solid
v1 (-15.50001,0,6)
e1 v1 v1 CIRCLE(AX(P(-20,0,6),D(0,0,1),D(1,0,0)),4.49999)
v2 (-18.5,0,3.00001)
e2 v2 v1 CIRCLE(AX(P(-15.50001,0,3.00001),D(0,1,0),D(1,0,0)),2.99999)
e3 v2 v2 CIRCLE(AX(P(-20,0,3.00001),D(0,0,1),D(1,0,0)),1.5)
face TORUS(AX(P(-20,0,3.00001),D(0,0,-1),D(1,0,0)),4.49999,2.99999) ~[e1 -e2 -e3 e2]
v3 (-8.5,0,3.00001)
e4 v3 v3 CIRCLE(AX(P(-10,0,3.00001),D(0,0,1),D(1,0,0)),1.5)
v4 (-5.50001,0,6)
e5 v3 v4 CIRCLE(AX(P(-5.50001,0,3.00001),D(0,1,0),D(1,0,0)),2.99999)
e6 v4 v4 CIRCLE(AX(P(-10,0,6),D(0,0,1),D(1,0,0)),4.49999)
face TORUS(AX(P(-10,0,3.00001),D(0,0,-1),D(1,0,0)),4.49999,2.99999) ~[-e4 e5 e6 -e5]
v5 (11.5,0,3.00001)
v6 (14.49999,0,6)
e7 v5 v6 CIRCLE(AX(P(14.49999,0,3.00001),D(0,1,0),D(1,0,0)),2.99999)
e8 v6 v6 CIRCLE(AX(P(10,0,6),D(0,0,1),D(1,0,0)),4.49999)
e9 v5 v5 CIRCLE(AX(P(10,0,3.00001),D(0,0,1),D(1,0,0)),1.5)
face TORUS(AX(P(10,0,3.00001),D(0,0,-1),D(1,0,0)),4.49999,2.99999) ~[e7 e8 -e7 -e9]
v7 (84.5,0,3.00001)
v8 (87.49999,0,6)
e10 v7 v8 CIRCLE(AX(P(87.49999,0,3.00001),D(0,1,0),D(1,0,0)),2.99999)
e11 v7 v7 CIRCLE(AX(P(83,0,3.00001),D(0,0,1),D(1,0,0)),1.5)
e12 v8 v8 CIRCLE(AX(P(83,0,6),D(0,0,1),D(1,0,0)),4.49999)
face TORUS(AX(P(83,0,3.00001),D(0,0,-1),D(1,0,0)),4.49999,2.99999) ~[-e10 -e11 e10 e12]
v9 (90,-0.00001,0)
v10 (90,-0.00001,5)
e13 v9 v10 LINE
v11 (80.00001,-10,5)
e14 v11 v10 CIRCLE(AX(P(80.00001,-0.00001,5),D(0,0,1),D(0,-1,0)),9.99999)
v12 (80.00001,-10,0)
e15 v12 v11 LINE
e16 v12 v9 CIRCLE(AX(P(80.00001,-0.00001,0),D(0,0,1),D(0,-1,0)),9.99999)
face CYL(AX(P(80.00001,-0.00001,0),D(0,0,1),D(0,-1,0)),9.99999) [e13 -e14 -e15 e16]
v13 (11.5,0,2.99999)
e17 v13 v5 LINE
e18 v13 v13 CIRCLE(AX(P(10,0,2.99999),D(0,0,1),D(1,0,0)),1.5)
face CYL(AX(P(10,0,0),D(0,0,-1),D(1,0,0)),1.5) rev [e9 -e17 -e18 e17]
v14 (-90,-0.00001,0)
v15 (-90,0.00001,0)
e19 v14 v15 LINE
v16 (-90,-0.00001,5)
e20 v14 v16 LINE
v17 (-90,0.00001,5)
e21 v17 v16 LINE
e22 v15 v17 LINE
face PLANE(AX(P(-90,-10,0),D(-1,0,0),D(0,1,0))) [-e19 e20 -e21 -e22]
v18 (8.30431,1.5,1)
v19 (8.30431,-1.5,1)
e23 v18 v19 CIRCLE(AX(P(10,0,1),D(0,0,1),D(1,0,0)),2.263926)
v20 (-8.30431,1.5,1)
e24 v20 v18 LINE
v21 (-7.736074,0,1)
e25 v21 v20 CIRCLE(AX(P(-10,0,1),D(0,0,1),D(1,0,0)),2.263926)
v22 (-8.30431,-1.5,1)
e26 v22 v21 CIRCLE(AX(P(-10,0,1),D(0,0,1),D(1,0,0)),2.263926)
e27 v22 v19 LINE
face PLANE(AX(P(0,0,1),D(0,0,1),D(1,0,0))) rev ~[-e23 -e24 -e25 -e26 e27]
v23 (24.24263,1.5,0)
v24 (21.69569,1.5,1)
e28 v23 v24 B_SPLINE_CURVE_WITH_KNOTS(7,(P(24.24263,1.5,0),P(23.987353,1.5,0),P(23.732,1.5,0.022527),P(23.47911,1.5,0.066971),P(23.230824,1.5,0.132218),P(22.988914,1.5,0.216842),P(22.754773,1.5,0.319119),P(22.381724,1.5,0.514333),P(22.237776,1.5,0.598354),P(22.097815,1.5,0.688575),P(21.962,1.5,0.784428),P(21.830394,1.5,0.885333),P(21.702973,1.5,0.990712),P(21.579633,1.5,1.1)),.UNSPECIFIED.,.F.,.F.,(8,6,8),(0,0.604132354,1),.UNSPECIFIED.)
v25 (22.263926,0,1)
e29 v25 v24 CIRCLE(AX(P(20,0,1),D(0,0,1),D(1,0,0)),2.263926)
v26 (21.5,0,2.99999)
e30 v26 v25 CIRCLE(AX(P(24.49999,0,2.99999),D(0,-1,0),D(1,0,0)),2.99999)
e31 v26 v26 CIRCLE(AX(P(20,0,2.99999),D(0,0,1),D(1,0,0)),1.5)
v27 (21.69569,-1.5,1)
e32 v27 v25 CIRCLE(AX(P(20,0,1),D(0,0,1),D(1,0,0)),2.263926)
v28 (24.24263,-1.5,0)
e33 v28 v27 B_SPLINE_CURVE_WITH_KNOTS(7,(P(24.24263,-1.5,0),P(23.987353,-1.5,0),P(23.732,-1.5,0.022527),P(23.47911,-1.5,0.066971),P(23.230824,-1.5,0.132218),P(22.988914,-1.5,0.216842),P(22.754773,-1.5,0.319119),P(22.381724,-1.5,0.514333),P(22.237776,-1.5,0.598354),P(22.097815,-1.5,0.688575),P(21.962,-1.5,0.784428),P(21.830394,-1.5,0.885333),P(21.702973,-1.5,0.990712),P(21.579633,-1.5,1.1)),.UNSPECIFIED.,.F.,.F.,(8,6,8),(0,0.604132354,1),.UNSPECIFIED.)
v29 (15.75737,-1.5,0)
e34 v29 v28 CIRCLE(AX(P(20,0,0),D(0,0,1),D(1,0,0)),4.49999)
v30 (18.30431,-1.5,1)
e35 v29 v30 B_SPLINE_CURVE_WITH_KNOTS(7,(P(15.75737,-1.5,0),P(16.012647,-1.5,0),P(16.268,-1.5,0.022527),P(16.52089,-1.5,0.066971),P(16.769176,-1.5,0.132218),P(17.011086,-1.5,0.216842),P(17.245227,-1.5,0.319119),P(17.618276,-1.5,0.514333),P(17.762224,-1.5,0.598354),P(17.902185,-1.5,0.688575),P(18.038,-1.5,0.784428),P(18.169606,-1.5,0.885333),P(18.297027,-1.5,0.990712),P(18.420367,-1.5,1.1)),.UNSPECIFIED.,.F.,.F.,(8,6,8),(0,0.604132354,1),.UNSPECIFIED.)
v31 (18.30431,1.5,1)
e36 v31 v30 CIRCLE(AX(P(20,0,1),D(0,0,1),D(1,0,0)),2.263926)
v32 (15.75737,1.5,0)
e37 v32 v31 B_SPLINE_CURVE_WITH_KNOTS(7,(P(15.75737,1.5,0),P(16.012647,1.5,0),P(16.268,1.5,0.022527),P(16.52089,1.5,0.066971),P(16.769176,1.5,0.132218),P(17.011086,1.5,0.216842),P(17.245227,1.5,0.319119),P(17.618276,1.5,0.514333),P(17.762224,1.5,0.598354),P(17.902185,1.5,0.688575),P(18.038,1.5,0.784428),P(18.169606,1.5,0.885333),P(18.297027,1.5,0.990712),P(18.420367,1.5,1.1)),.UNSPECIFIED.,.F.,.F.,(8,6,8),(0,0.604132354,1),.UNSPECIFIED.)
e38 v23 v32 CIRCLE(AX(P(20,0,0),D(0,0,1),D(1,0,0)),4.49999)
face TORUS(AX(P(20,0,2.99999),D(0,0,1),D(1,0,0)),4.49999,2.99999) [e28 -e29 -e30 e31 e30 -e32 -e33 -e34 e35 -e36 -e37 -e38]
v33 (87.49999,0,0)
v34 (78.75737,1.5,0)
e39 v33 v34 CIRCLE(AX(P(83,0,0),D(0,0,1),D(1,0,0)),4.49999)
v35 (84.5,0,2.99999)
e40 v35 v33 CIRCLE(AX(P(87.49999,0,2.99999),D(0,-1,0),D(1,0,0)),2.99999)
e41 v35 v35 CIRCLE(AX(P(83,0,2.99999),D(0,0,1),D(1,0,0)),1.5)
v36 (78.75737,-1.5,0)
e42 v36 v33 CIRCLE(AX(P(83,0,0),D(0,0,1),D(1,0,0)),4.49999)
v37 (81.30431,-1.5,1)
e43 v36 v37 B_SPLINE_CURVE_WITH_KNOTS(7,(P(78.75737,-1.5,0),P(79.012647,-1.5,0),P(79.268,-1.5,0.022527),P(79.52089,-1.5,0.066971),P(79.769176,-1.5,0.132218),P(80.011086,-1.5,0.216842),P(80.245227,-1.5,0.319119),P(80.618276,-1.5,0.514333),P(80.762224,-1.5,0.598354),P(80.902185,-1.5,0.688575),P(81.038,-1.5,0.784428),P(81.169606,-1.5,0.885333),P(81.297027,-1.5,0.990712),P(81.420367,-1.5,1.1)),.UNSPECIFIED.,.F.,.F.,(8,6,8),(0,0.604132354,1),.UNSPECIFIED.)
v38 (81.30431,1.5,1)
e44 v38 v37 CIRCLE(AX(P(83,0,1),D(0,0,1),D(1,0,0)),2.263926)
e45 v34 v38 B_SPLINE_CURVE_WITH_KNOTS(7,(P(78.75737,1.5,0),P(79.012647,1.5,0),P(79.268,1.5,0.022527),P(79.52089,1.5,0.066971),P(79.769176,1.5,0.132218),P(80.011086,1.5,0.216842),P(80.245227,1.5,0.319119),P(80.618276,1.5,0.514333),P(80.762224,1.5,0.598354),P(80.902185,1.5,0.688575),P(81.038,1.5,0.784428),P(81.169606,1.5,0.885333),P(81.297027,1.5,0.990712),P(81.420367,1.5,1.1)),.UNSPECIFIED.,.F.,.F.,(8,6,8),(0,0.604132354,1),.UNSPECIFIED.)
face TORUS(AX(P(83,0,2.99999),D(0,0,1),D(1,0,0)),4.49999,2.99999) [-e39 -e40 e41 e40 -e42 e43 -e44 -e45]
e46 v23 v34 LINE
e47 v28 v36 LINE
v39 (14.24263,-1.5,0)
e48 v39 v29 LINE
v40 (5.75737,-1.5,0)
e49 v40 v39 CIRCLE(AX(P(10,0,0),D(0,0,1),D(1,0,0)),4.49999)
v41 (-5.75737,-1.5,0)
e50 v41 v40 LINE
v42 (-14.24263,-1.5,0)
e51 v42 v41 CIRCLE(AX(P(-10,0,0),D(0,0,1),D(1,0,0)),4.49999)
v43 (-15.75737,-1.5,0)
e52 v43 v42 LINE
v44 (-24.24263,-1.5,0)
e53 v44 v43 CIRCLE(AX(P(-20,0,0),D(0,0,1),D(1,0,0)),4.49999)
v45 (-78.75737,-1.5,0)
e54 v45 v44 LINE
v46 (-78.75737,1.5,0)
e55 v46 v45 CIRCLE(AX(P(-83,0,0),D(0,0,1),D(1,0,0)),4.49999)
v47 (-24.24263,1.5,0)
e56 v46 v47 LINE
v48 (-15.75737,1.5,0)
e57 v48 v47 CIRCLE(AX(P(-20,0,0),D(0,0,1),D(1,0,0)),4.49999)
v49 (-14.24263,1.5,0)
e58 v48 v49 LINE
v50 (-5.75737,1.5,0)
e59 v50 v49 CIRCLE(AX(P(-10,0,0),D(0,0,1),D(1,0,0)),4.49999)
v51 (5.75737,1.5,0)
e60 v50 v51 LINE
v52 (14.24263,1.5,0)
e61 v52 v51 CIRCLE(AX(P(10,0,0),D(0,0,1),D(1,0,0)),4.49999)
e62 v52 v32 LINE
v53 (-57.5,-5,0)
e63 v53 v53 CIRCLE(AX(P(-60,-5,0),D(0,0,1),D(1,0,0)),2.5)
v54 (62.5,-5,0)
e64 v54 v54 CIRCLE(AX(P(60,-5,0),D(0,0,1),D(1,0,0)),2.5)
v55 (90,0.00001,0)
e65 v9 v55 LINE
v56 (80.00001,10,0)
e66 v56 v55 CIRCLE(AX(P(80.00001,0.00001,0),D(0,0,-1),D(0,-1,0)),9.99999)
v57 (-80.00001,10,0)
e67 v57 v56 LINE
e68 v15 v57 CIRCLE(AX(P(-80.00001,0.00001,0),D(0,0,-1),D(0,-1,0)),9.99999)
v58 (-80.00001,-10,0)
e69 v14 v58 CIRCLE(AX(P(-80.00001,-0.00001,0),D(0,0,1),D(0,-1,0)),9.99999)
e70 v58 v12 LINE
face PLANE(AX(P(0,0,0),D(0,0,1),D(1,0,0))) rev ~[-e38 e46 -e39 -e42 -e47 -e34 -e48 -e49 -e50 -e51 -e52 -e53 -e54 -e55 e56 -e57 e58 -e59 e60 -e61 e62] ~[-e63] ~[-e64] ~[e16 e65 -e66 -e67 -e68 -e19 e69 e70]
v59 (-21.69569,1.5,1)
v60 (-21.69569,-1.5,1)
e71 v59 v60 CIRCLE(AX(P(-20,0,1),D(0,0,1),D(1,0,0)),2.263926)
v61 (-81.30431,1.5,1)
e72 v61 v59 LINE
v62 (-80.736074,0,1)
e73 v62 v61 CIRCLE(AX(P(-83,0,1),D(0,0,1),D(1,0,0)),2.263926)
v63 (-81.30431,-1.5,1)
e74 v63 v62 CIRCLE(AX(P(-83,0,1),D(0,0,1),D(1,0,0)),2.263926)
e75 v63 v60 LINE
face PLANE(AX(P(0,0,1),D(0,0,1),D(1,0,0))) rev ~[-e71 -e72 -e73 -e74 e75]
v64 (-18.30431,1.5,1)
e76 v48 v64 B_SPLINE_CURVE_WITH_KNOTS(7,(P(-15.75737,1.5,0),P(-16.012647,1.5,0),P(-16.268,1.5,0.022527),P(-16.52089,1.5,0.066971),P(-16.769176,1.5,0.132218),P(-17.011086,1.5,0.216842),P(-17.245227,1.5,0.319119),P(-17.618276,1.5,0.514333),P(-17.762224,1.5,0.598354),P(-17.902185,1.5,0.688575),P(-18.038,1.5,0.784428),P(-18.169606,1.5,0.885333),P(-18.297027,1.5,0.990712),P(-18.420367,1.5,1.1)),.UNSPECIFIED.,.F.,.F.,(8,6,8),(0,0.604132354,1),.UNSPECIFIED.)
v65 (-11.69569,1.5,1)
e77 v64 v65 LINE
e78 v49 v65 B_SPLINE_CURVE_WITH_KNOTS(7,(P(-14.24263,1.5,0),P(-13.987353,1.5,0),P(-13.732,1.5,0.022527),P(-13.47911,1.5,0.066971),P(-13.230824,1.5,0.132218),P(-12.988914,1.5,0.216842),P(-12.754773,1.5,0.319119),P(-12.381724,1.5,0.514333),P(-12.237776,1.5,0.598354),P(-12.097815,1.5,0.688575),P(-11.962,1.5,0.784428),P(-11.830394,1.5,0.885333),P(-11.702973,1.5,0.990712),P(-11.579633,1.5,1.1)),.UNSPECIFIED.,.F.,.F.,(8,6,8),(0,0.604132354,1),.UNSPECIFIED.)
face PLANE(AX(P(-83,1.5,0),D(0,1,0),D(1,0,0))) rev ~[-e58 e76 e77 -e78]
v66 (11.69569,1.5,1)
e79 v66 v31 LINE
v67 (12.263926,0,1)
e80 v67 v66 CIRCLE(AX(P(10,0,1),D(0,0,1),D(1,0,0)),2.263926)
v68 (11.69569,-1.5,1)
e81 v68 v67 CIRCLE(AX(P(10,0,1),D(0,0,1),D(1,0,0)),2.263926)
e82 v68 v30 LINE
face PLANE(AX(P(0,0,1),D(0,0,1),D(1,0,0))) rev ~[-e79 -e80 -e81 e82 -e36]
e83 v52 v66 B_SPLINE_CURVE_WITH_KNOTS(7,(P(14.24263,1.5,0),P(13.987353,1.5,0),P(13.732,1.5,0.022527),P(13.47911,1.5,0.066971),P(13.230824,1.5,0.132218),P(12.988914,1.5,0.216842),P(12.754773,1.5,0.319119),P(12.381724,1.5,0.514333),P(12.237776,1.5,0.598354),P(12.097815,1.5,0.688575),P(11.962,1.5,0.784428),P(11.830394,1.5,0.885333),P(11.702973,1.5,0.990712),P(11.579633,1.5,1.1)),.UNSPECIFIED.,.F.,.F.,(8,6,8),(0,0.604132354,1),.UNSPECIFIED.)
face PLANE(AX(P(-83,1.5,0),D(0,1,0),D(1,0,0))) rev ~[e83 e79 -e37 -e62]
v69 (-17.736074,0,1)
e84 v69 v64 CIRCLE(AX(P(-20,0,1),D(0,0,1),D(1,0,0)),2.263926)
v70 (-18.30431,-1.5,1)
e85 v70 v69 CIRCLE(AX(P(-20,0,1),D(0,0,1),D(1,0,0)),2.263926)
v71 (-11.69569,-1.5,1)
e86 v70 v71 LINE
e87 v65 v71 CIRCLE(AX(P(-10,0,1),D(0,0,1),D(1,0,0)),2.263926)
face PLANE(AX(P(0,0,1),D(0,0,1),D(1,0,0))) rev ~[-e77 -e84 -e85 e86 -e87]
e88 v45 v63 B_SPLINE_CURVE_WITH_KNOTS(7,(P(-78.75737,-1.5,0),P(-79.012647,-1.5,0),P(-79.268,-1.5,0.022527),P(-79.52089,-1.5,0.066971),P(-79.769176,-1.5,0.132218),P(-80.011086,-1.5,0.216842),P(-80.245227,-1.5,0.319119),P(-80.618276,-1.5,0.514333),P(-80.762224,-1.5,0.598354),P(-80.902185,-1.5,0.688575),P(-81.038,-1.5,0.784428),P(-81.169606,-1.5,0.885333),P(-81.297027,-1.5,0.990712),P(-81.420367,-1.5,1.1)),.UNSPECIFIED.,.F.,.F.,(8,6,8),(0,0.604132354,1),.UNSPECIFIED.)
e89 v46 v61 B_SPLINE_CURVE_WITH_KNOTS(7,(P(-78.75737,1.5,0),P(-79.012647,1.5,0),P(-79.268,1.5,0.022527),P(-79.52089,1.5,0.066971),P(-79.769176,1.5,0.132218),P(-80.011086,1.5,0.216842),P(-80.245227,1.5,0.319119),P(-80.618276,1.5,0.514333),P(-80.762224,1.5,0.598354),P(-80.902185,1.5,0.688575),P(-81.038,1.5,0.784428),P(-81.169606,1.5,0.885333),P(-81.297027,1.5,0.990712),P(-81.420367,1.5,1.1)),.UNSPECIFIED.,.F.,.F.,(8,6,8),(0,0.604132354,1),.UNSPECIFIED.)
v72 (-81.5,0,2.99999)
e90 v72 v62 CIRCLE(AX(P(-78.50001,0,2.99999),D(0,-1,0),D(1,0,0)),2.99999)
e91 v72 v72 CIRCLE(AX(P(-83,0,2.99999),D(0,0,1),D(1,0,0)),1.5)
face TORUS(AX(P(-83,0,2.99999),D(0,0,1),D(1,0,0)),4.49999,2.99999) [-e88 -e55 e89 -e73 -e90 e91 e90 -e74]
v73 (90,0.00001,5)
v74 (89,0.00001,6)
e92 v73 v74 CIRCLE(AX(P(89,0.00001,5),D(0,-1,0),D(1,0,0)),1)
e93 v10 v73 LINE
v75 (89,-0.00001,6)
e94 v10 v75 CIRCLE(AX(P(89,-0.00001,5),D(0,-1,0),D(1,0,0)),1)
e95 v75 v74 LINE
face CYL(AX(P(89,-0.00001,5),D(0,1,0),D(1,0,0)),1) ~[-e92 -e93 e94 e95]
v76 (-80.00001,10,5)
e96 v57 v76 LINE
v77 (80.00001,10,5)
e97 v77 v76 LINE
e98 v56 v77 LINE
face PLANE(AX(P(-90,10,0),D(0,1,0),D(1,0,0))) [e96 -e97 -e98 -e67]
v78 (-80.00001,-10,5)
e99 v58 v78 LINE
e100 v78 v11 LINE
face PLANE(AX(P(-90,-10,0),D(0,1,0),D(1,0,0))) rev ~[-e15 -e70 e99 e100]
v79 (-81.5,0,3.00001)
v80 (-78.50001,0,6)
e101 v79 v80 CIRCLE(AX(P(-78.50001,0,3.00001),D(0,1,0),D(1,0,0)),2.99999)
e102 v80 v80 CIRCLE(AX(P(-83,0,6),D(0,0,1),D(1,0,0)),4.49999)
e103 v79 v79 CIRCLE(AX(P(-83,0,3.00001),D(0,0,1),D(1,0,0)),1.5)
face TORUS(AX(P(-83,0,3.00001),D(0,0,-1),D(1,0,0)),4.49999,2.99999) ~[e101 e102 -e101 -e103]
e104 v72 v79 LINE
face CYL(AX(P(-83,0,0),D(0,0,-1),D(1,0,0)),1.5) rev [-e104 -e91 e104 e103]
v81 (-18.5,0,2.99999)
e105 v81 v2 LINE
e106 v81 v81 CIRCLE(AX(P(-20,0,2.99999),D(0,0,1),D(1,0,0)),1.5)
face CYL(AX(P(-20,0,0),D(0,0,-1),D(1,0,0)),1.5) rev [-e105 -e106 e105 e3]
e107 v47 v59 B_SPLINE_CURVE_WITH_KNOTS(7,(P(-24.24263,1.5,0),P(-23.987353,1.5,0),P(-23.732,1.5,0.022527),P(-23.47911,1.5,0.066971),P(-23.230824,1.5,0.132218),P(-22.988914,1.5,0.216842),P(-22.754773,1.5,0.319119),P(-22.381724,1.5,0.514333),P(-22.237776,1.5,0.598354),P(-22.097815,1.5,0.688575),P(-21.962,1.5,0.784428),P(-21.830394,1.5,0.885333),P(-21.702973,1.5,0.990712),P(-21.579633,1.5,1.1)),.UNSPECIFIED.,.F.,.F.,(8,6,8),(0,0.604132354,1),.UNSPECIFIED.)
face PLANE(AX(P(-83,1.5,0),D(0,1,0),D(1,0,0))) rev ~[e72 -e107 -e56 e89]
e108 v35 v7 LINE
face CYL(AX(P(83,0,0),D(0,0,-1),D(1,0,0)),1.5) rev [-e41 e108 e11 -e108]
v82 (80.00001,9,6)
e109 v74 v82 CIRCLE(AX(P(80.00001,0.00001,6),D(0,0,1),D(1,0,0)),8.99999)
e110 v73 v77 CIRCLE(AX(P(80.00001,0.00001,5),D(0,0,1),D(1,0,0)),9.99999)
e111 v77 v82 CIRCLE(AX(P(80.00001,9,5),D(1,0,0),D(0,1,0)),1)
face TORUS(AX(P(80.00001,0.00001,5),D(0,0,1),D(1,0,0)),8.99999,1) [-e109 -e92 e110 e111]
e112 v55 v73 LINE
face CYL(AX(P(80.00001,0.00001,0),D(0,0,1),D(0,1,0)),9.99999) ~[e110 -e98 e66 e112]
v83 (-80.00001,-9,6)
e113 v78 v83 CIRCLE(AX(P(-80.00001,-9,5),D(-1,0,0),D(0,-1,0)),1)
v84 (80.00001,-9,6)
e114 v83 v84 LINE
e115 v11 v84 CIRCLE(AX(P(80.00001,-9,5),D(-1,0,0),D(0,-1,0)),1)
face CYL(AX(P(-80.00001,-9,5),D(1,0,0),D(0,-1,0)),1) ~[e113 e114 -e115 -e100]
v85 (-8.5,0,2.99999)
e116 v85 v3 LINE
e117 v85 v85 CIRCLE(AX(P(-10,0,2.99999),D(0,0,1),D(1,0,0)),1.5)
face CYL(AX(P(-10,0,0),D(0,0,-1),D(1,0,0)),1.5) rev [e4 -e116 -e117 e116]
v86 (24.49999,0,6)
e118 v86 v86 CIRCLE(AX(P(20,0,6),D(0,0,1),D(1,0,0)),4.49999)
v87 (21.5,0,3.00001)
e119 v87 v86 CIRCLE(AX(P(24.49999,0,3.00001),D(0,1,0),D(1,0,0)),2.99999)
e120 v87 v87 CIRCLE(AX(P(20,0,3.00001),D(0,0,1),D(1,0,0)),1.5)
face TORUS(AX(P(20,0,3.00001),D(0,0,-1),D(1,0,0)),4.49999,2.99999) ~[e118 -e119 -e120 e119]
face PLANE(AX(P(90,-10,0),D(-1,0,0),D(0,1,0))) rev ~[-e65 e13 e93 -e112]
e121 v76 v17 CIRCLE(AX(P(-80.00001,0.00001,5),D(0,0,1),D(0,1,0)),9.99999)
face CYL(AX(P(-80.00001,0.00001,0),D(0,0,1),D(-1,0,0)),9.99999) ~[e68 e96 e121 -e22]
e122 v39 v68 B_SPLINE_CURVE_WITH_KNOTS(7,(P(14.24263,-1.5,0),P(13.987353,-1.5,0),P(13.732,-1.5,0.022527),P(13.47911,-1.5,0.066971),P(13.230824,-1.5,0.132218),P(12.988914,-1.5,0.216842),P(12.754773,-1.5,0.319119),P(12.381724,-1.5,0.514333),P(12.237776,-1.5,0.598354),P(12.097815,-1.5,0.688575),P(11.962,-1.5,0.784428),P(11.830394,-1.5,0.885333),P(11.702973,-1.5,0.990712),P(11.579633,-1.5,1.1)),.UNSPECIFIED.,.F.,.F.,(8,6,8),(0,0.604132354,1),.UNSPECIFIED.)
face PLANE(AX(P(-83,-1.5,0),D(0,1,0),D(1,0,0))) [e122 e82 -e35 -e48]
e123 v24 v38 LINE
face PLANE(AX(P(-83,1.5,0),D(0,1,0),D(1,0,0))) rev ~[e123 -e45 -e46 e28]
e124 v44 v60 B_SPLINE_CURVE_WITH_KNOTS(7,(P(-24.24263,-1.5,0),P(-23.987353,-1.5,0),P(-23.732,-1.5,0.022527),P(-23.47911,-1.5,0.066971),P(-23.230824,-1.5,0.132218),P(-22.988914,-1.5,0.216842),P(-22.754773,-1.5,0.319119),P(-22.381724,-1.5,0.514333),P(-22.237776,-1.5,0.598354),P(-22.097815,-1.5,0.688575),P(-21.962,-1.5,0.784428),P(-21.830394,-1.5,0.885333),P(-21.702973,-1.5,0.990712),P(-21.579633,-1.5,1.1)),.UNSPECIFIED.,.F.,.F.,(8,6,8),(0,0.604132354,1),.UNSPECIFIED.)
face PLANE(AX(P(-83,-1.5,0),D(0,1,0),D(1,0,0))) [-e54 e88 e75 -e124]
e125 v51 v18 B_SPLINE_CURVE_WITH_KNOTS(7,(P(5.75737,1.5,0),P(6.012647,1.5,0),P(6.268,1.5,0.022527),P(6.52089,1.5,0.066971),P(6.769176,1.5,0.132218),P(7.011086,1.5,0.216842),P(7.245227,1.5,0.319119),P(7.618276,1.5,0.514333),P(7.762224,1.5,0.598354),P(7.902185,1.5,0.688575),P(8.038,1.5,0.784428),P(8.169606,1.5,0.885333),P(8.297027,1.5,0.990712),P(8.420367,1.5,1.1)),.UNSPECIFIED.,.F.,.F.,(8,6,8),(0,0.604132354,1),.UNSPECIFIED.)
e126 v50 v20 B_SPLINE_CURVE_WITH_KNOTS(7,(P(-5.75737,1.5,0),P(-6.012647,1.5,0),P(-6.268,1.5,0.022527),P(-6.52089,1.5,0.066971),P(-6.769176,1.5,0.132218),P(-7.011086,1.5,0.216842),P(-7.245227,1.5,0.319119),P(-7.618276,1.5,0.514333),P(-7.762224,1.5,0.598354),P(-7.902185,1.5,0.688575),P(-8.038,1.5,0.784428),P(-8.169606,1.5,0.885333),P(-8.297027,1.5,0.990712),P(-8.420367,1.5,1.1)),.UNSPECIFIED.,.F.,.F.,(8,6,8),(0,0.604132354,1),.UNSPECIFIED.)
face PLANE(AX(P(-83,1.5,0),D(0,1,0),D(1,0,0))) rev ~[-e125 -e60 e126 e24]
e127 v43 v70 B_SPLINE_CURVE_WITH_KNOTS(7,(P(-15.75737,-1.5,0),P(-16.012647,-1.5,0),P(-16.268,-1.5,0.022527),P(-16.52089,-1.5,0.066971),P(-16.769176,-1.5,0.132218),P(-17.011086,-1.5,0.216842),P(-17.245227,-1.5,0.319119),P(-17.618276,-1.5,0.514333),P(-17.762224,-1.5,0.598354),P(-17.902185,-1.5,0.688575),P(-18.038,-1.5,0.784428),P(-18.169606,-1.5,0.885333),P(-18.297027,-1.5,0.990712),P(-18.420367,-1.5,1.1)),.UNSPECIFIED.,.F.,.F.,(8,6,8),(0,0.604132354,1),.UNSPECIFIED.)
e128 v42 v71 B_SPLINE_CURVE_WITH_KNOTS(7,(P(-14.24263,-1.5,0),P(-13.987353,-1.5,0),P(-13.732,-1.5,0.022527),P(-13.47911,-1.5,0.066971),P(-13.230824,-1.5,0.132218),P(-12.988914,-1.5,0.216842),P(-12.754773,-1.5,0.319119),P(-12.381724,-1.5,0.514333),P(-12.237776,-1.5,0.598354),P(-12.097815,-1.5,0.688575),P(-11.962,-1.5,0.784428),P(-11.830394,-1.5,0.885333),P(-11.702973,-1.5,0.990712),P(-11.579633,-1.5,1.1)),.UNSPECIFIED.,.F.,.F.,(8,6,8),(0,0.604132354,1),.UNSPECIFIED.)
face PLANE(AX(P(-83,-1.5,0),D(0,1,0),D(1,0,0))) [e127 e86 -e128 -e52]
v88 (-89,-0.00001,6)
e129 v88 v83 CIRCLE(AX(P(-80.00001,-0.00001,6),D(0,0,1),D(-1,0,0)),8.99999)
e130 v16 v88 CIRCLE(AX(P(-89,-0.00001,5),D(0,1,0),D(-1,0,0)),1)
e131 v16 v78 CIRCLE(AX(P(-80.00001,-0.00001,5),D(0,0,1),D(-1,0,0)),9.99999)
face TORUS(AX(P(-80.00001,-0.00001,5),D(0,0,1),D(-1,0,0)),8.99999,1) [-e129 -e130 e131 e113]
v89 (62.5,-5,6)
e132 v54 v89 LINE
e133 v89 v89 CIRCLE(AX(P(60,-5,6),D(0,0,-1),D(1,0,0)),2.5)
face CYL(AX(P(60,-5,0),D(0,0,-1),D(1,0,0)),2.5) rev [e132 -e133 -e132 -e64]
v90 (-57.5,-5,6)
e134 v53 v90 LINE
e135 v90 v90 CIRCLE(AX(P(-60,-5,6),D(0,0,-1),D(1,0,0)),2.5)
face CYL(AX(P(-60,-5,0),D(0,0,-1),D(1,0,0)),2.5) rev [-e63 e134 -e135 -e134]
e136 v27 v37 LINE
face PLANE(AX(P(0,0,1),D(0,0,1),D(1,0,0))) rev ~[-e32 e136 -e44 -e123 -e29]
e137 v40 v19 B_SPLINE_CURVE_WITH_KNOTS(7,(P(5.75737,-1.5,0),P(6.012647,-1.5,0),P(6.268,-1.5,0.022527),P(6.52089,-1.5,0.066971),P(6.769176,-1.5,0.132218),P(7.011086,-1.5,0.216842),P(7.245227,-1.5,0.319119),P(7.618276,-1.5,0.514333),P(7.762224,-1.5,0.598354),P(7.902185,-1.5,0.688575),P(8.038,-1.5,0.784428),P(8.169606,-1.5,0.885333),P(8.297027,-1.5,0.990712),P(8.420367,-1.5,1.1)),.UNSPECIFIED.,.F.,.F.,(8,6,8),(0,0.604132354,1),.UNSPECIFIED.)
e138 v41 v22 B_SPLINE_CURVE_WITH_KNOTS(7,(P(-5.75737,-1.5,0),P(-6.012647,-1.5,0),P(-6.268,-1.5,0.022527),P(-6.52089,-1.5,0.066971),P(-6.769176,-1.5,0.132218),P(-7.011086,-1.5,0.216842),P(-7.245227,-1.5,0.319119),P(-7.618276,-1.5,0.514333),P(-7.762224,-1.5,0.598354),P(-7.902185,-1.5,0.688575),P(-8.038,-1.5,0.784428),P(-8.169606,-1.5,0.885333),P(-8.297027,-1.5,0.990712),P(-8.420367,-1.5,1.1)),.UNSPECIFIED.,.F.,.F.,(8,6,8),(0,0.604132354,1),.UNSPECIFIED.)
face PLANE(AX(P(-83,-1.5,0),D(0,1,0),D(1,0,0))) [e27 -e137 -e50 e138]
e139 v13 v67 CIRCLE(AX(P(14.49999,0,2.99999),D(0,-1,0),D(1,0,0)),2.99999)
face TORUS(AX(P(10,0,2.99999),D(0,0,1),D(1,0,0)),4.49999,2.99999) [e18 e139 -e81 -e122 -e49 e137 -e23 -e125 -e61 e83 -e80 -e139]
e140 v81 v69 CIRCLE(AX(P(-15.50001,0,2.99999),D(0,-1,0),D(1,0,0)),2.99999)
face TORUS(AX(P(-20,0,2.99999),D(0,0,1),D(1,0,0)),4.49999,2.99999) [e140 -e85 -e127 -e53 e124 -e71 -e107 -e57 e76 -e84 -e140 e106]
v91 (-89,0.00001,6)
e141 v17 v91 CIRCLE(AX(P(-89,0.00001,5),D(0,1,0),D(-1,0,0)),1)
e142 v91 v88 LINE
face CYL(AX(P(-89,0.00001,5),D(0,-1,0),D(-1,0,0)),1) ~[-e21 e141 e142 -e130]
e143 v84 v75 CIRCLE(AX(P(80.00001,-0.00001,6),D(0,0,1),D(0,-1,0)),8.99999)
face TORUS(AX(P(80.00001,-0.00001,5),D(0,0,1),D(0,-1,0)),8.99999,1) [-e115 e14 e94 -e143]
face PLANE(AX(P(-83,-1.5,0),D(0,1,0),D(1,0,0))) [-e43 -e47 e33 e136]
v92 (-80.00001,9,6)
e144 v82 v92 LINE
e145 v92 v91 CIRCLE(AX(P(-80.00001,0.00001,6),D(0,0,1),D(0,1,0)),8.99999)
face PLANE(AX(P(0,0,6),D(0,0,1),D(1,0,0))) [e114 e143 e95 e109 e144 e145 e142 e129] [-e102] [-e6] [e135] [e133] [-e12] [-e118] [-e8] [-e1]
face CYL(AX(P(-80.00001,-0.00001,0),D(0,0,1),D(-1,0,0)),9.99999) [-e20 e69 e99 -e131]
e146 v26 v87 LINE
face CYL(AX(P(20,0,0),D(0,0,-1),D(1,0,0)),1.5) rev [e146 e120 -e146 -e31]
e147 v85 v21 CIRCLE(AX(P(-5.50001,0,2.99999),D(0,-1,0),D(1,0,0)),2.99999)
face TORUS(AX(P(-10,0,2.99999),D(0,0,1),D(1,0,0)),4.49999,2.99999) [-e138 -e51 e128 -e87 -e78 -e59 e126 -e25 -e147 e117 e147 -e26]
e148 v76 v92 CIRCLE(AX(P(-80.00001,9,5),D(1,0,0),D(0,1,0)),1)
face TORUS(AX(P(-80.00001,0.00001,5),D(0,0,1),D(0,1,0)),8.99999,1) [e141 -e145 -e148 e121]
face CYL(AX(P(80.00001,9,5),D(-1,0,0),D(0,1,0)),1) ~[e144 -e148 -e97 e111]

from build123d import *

# Parameters (mm, degrees)
F0_W     = 180
F0_H     = 20
F0_R     = 1.5
F1_DEPTH = 6
F2_R     = 2.99999
F3_R     = 9.99999
F4_W     = 166
F4_H     = 3
F5_DEPTH = 1
F6_R     = 1
F7_R     = 2.5
F8_DEPTH = 25


# Not quite as in the source:
# - a fillet or chamfer is up to 0.001 mm smaller than in the source, because OpenCascade refuses the exact size


with BuildPart() as f1:
    # F0 (on Top) → F1 (new body)
    with BuildSketch(Plane.XY):
        Rectangle(F0_W, F0_H)
        with Locations((-83, 0)):
            Circle(F0_R, mode=Mode.SUBTRACT)
        with Locations((-20, 0)):
            Circle(F0_R, mode=Mode.SUBTRACT)
        with Locations((-10, 0)):
            Circle(F0_R, mode=Mode.SUBTRACT)
        with Locations((10, 0)):
            Circle(F0_R, mode=Mode.SUBTRACT)
        with Locations((20, 0)):
            Circle(F0_R, mode=Mode.SUBTRACT)
        with Locations((83, 0)):
            Circle(F0_R, mode=Mode.SUBTRACT)
    extrude(amount=F1_DEPTH)

    # F2 (radius 3 in the source; OpenCascade refuses exactly that, so slightly less here)
    f2_edges = [f1.edges().sort_by_distance(p)[0] for p in [
        (-84.5, 0, 6),
        (81.5, 0, 6),
        (-84.5, 0, 0),
        (81.5, 0, 0),
        (18.5, 0, 0),
        (8.5, 0, 0),
        (-11.5, 0, 0),
        (-21.5, 0, 0),
        (-21.5, 0, 6),
        (-11.5, 0, 6),
        (8.5, 0, 6),
        (18.5, 0, 6),
    ]]
    fillet(f2_edges, radius=F2_R)

    # F3 (radius 10 in the source; OpenCascade refuses exactly that, so slightly less here)
    f3_edges = [f1.edges().sort_by_distance(p)[0] for p in [
        (-90, -10, 3),
        (-90, 10, 3),
        (90, -10, 3),
        (90, 10, 3),
    ]]
    fillet(f3_edges, radius=F3_R)

    # F4 (on Top) → F5 (cut)
    with BuildSketch(Plane.XY):
        Rectangle(F4_W, F4_H)
    extrude(amount=F5_DEPTH, mode=Mode.SUBTRACT)

    # F6
    f6_edges = [f1.edges().sort_by_distance(p)[0] for p in [
        (0, -10, 6),
    ]]
    fillet(f6_edges, radius=F6_R)

    # F7 (on Top) → F8 (cut)
    with BuildSketch(Plane.XY):
        with Locations((-60, -5)):
            Circle(F7_R)
        with Locations((60, -5)):
            Circle(F7_R)
    extrude(amount=F8_DEPTH, mode=Mode.SUBTRACT)


solid = f1.part
